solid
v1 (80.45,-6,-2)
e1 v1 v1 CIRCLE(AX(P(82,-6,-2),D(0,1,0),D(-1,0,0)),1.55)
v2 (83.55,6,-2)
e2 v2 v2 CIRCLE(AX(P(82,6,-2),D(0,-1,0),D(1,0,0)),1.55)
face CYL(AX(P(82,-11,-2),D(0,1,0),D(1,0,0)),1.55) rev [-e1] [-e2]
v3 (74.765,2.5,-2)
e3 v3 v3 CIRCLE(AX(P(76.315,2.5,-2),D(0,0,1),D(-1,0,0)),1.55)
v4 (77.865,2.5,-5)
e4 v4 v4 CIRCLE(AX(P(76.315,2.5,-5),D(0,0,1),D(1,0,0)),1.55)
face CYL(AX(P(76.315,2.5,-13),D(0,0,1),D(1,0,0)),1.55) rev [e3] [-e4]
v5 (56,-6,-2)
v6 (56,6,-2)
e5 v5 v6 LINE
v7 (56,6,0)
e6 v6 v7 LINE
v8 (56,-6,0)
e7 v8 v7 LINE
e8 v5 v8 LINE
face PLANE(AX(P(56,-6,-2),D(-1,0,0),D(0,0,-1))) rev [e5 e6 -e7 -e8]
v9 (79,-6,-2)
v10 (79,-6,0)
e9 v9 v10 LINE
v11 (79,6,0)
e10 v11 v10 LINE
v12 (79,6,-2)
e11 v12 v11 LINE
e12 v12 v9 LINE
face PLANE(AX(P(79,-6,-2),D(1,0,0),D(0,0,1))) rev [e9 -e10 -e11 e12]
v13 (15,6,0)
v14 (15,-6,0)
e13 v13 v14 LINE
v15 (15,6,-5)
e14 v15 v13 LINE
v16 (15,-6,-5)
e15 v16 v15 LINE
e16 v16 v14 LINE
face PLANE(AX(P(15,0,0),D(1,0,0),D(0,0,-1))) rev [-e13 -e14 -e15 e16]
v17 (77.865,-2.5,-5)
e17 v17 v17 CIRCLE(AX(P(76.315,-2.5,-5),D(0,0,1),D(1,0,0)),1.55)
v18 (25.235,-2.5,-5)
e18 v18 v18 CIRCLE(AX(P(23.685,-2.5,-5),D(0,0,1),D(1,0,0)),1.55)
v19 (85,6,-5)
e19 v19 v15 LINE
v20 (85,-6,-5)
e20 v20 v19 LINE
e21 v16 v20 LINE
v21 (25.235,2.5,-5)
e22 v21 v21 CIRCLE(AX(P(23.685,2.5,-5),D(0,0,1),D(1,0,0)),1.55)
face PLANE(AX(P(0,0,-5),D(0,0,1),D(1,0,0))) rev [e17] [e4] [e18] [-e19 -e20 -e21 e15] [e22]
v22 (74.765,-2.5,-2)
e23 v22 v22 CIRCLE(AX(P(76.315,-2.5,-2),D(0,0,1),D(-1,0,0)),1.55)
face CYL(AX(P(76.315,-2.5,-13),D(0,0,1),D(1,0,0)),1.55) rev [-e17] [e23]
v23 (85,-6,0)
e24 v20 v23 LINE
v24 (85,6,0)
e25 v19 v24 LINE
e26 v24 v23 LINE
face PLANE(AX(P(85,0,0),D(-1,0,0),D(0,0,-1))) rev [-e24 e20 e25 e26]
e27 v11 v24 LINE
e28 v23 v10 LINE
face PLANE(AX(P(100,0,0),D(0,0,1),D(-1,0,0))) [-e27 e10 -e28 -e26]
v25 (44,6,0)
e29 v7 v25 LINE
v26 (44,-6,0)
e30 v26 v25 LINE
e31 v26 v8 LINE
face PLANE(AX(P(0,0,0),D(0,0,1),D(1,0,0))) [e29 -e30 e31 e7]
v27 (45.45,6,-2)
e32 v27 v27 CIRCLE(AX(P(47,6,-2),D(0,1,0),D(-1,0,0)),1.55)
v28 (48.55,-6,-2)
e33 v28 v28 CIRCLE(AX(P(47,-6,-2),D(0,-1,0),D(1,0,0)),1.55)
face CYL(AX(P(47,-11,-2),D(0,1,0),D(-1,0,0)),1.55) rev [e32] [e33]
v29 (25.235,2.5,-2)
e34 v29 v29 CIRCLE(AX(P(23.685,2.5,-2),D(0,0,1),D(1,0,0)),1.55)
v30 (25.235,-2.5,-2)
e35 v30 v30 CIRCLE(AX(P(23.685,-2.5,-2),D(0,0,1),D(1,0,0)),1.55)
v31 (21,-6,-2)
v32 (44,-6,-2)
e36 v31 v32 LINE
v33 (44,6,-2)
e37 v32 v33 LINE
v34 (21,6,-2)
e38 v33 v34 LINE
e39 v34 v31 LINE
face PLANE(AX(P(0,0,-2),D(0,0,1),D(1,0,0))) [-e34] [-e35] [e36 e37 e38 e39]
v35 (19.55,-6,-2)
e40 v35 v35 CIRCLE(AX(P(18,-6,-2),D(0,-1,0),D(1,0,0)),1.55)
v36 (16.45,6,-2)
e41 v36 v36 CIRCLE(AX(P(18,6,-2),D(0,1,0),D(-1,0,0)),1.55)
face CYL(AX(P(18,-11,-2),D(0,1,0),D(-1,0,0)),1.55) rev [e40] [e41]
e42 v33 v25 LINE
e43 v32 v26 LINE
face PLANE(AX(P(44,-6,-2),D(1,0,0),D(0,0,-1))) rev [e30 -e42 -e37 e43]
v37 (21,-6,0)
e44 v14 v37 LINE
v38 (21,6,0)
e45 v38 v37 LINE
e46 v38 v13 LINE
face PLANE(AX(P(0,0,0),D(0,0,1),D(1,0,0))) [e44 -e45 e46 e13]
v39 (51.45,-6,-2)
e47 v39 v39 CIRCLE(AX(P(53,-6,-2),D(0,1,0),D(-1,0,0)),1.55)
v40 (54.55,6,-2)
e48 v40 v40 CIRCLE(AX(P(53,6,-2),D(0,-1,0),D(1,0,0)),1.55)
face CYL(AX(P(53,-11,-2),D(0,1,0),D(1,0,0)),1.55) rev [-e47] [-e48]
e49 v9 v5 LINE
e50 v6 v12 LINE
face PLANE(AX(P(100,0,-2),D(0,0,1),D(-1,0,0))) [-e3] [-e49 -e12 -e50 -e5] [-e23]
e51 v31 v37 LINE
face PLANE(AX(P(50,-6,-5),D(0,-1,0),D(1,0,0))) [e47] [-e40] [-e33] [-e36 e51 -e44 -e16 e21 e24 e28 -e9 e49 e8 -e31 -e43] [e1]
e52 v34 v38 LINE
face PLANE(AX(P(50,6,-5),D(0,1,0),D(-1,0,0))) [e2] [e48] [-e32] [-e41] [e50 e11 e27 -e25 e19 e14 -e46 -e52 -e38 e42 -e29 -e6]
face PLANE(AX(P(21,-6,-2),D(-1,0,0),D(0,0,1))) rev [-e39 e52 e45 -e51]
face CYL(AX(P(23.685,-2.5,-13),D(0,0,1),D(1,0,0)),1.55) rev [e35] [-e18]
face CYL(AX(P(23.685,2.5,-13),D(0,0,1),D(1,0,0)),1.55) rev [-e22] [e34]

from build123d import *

# Parameters (mm, degrees)
SKETCH_1_W                = 100
SKETCH_1_H                = 12
SKETCH_1_R                = 1.75
EXTRUDE_1_DEPTH           = 5
EXTRUDE_2_DEPTH           = 3
EXTRUDE_5_DEPTH           = 35
CUT_EXTRUDE_START         = -7
CUT_EXTRUDE_3_OUTLINE_R   = 1.75
CUT_EXTRUDE_3_DEPTH       = 14
SKETCH_19_W               = 65
SKETCH_19_H               = 12
CUT_EXTRUDE_7_DEPTH       = 10
CUT_EXTRUDE_8_DEPTH       = 10
SKETCH_21_R               = 1.75
CUT_EXTRUDE_9_DEPTH       = 25
FILLET_3_R                = 2
FILLET_4_R                = 1
FILLET_5_R                = 5
CUT_EXTRUDE_10_DEPTH      = 10
CUT_EXTRUDE_10_DEPTH_BACK = 20
SKETCH_22_W               = 69.035693394
SKETCH_22_H               = 99.85453556
SKETCH_24_W               = 23
SKETCH_24_H               = 12
CUT_EXTRUDE_11_DEPTH      = 2
SKETCH_25_R               = 1.55
CUT_EXTRUDE_12_DEPTH      = 17
SKETCH_27_R               = 1.75
EXTRUDE_7_DEPTH           = 3
SKETCH_28_R               = 1.55
CUT_EXTRUDE_13_DEPTH      = 11


# Read off the part's stored shape, not the designer's step: 切除-拉伸3
with BuildPart() as part:
    # 草图1 → 凸台-拉伸1 (new body)
    with BuildSketch(Plane.XY):
        Rectangle(SKETCH_1_W, SKETCH_1_H)
        with Locations((-26.315, 2.5)):
            Circle(SKETCH_1_R, mode=Mode.SUBTRACT)
        with Locations((-26.315, -2.5)):
            Circle(SKETCH_1_R, mode=Mode.SUBTRACT)
        with Locations((26.315, -2.5)):
            Circle(SKETCH_1_R, mode=Mode.SUBTRACT)
        with Locations((26.315, 2.5)):
            Circle(SKETCH_1_R, mode=Mode.SUBTRACT)
    extrude(amount=-EXTRUDE_1_DEPTH)

    # 草图2 → 凸台-拉伸2 (add)
    with BuildSketch(Plane(origin=(15, 0, 0), x_dir=(0, 0, -1), z_dir=(1, 0, 0))):
        Polygon((0, 6), (-92, 7), (-92, -7), (0, -6), align=None)
    extrude(amount=EXTRUDE_2_DEPTH)

    # 草图10 → 凸台-拉伸5 (add)
    with BuildSketch(Plane(origin=(18, 0, 0), x_dir=(0, 0, -1), z_dir=(1, 0, 0))):
        Polygon((-92, -3.999822784), (-92, -7), (0, -6), (0, -2.999822784), align=None)
        Polygon((-92, 7), (-92, 3.999822784), (0, 2.999822784), (0, 6), align=None)
    extrude(amount=EXTRUDE_5_DEPTH)

    # 切除-拉伸3 outline → 切除-拉伸3 (cut)
    with BuildSketch(Plane(origin=(0, 0, 0), x_dir=(1, 0, 0), z_dir=(0, 1, 0)).offset(CUT_EXTRUDE_START)):
        Polygon((29.145728922, -84.958399081), (31.382950186, -83.842674644), (15, -50.992014289), (15, -92), (32.657445151, -92), align=None)
        Polygon((42.101361871, -11.45542087), (17.526825547, -47.095951771), (33.361948293, -78.848122968), align=None)
        Polygon((40.711441699, -87.983392029), (32.657445151, -92), (53, -92), (53, 0), (50, 0), (44.585265539, -7.853007208), (34.962504207, -82.057515546), (37.199725471, -80.941791109), align=None)
        with Locations((19, -37.702345436)):
            Circle(CUT_EXTRUDE_3_OUTLINE_R)
        with BuildLine():
            Line((22.646536548, -32.624253352), (45.141316474, 0))
            Line((45.141316474, 0), (19, 0))
            Line((19, 0), (19, -31.488948372))
            ThreePointArc((19, -31.488948372), (20.405472076, -33.398539047), (22.646536548, -32.624253352))
        make_face()
    extrude(amount=CUT_EXTRUDE_3_DEPTH, mode=Mode.SUBTRACT)

    # 草图19 → 切除-拉伸7 (cut)
    with BuildSketch(Plane.XY):
        with Locations((-17.5, 0)):
            Rectangle(SKETCH_19_W, SKETCH_19_H)
    extrude(amount=-CUT_EXTRUDE_7_DEPTH, mode=Mode.SUBTRACT)

    # 草图20 → 切除-拉伸8 (cut)
    with BuildSketch(Plane.ZY.offset(-15)):
        Polygon((0, 2.999822784), (0, -2.999822784), (59.734349104, -3.649109187), (59.734349104, 3.649109187), align=None)
    extrude(amount=-CUT_EXTRUDE_8_DEPTH, mode=Mode.SUBTRACT)

    # 草图21 → 切除-拉伸9 (cut, symmetric)
    with BuildSketch(Plane(origin=(0, 0, 0.28540368), x_dir=(1, 0, 0), z_dir=(0, -1, 0))):
        with Locations(Location((35, 86.328690729, 0), (0, 0, 270))):
            Circle(SKETCH_21_R)
    extrude(amount=CUT_EXTRUDE_9_DEPTH, both=True, mode=Mode.SUBTRACT)

    # 圆角3
    # the kernel refuses this fillet: 2 mm, written as the material it adds along each edge
    with BuildSketch(Plane(origin=(31.382950186, -1.088843796, 83.842674644), x_dir=(-0.4462897746148819, 0, -0.8948885053872343), z_dir=(0, 1, 0))) as fillet_3_piece_1_section:
        with BuildLine():
            CenterArc((FILLET_3_R, FILLET_3_R), FILLET_3_R, 180.000000004, 89.999999996)
            Line((-FILLET_3_R * 7.06970432153e-11, FILLET_3_R), (-FILLET_3_R * 0.0200000000707, FILLET_3_R))
            Line((-FILLET_3_R * 0.0200000000707, FILLET_3_R), (-FILLET_3_R * 0.0199999999986, -FILLET_3_R * 0.02))
            Line((-FILLET_3_R * 0.0199999999986, -FILLET_3_R * 0.02), (FILLET_3_R, -FILLET_3_R * 0.02))
            Line((FILLET_3_R, -FILLET_3_R * 0.02), (FILLET_3_R, 0))
        make_face()
    fillet_3_piece_1 = extrude(amount=13.000177215, mode=Mode.PRIVATE)
    fillet_3_piece_1 = split(fillet_3_piece_1, bisect_by=Plane(origin=(30.775677766, 3.909125577, 83.655856907), z_dir=(0, 0.9999409315100345, -0.01086892316858714)), keep=Keep.TOP, mode=Mode.PRIVATE)
    fillet_3_piece_1 = split(fillet_3_piece_1, bisect_by=Plane(origin=(30.775677766, 6.908948371, 83.623250137), z_dir=(0, -0.9999409315100345, 0.010868923168587275)), keep=Keep.TOP, mode=Mode.PRIVATE)
    add(fillet_3_piece_1)
    with BuildSketch(Plane(origin=(31.382950186, -11.91133342, 83.842674644), x_dir=(-0.8948885053556793, 0, 0.44628977467815495), z_dir=(0, 1, 0))) as fillet_3_piece_2_section:
        with BuildLine():
            CenterArc((FILLET_3_R, -FILLET_3_R), FILLET_3_R, 90, 89.999999996)
            Line((-FILLET_3_R * 7.0703401566e-11, -FILLET_3_R), (-FILLET_3_R * 0.0200000000707, -FILLET_3_R))
            Line((-FILLET_3_R * 0.0200000000707, -FILLET_3_R), (-FILLET_3_R * 0.0199999999986, FILLET_3_R * 0.02))
            Line((-FILLET_3_R * 0.0199999999986, FILLET_3_R * 0.02), (FILLET_3_R, FILLET_3_R * 0.02))
            Line((FILLET_3_R, FILLET_3_R * 0.02), (FILLET_3_R, 0))
        make_face()
    fillet_3_piece_2 = extrude(amount=13.000177215, mode=Mode.PRIVATE)
    fillet_3_piece_2 = split(fillet_3_piece_2, bisect_by=Plane(origin=(30.775677766, -6.908948371, 83.623250137), z_dir=(0, 0.9999409315100345, 0.01086892316858739)), keep=Keep.TOP, mode=Mode.PRIVATE)
    fillet_3_piece_2 = split(fillet_3_piece_2, bisect_by=Plane(origin=(30.775677766, -3.909125577, 83.655856907), z_dir=(0, -0.9999409315100345, -0.010868923168587516)), keep=Keep.TOP, mode=Mode.PRIVATE)
    add(fillet_3_piece_2)
    with BuildSketch(Plane(origin=(17.526825547, -9.462581156, 47.095951771), x_dir=(0.4462897746085541, 0, 0.8948885053903899), z_dir=(0, 1, 0))) as fillet_3_piece_3_section:
        with BuildLine():
            CenterArc((FILLET_3_R * 0.590133727356, FILLET_3_R), FILLET_3_R, 208.907423837, 61.092576163)
            Line((-FILLET_3_R * 0.285268173202, FILLET_3_R * 0.516604186511), (-FILLET_3_R * 0.302776211214, FILLET_3_R * 0.506936270242))
            Line((-FILLET_3_R * 0.302776211214, FILLET_3_R * 0.506936270242), (-FILLET_3_R * 0.0118026745471, -FILLET_3_R * 0.02))
            Line((-FILLET_3_R * 0.0118026745471, -FILLET_3_R * 0.02), (FILLET_3_R * 0.590133727356, -FILLET_3_R * 0.02))
            Line((FILLET_3_R * 0.590133727356, -FILLET_3_R * 0.02), (FILLET_3_R * 0.590133727356, 0))
        make_face()
    fillet_3_piece_3 = extrude(amount=8.90151449, mode=Mode.PRIVATE)
    fillet_3_piece_3 = split(fillet_3_piece_3, bisect_by=Plane(origin=(17.786448955, -6.511934641, 47.097986993), z_dir=(0, 0.9999409315100345, 0.01086892316858739)), keep=Keep.TOP, mode=Mode.PRIVATE)
    fillet_3_piece_3 = split(fillet_3_piece_3, bisect_by=Plane(origin=(17.786448955, -3.512111847, 47.130593763), z_dir=(0, -0.9999409315100345, -0.010868923168587516)), keep=Keep.TOP, mode=Mode.PRIVATE)
    add(fillet_3_piece_3)
    with BuildSketch(Plane(origin=(34.962504207, -4.590143726, 82.057515546), x_dir=(0.8948885053556189, 0, -0.44628977467827596), z_dir=(0, 1, 0))) as fillet_3_piece_4_section:
        with BuildLine():
            CenterArc((3.552161927, 1.700868978), FILLET_3_R, 146.105291032, 92.153667276)
            Line((1.892034353, 2.816205895), (1.858831801, 2.838512633))
            Line((1.858831801, 2.838512633), (-0.033202551, 0.022306738))
            Line((-0.033202551, 0.022306738), (0, -0.04))
            ThreePointArc((0, -0.04), (1.25, -0.04), (2.478956762, -0.03401738))
            Line((2.478956762, -0.03401738), (2.500000001, 0))
        make_face()
    fillet_3_piece_4 = extrude(amount=19.96396927, mode=Mode.PRIVATE)
    fillet_3_piece_4 = split(fillet_3_piece_4, bisect_by=Plane(origin=(35.702859812, -3.878883458, 80.873581964), z_dir=(0, -0.9999409315100345, -0.010868923168587516)), keep=Keep.TOP, mode=Mode.PRIVATE)
    add(fillet_3_piece_4)
    with BuildSketch(Plane(origin=(34.962504207, -4.590143726, 82.057515546), x_dir=(0.8948885053556189, 0, -0.44628977467827596), z_dir=(0, 1, 0))) as fillet_3_piece_5_section:
        with BuildLine():
            CenterArc((3.552161927, 1.700868978), FILLET_3_R, 146.105291032, 92.153667276)
            Line((1.892034353, 2.816205895), (1.858831801, 2.838512633))
            Line((1.858831801, 2.838512633), (-0.033202551, 0.022306738))
            Line((-0.033202551, 0.022306738), (0, -0.04))
            ThreePointArc((0, -0.04), (1.25, -0.04), (2.478956762, -0.03401738))
            Line((2.478956762, -0.03401738), (2.500000001, 0))
        make_face()
    fillet_3_piece_5 = extrude(amount=19.96396927, mode=Mode.PRIVATE)
    fillet_3_piece_5 = split(fillet_3_piece_5, bisect_by=Plane(origin=(35.703261473, 3.879081131, 80.891767963), z_dir=(0, 0.9999409315100345, -0.01086892316858714)), keep=Keep.TOP, mode=Mode.PRIVATE)
    fillet_3_piece_5 = split(fillet_3_piece_5, bisect_by=Plane(origin=(35.703261473, 6.878903926, 80.859161193), z_dir=(0, -0.9999409315100345, 0.010868923168587275)), keep=Keep.TOP, mode=Mode.PRIVATE)
    add(fillet_3_piece_5)
    with BuildSketch(Plane(origin=(34.962504207, -15.373825544, 82.057515546), x_dir=(0.8948885053556189, 0, -0.44628977467827596), z_dir=(0, 1, 0))) as fillet_3_piece_6_section:
        with BuildLine():
            CenterArc((3.552161927, 1.700868978), FILLET_3_R, 146.105291032, 92.153667276)
            Line((1.892034353, 2.816205895), (1.858831801, 2.838512633))
            Line((1.858831801, 2.838512633), (-0.033202551, 0.022306738))
            Line((-0.033202551, 0.022306738), (0, -0.04))
            ThreePointArc((0, -0.04), (1.25, -0.04), (2.478956762, -0.03401738))
            Line((2.478956762, -0.03401738), (2.500000001, 0))
        make_face()
    fillet_3_piece_6 = extrude(amount=19.96396927, mode=Mode.PRIVATE)
    fillet_3_piece_6 = split(fillet_3_piece_6, bisect_by=Plane(origin=(35.703261473, -6.878903926, 80.859161193), z_dir=(0, 0.9999409315100345, 0.01086892316858739)), keep=Keep.TOP, mode=Mode.PRIVATE)
    fillet_3_piece_6 = split(fillet_3_piece_6, bisect_by=Plane(origin=(35.703261473, -3.879081131, 80.891767963), z_dir=(0, -0.9999409315100345, -0.010868923168587516)), keep=Keep.TOP, mode=Mode.PRIVATE)
    add(fillet_3_piece_6)
    with BuildSketch(Plane(origin=(34.962504207, -15.373825544, 82.057515546), x_dir=(0.8948885053556189, 0, -0.44628977467827596), z_dir=(0, 1, 0))) as fillet_3_piece_7_section:
        with BuildLine():
            CenterArc((3.552161927, 1.700868978), FILLET_3_R, 146.105291032, 92.153667276)
            Line((1.892034353, 2.816205895), (1.858831801, 2.838512633))
            Line((1.858831801, 2.838512633), (-0.033202551, 0.022306738))
            Line((-0.033202551, 0.022306738), (0, -0.04))
            ThreePointArc((0, -0.04), (1.25, -0.04), (2.478956762, -0.03401738))
            Line((2.478956762, -0.03401738), (2.500000001, 0))
        make_face()
    fillet_3_piece_7 = extrude(amount=19.96396927, mode=Mode.PRIVATE)
    fillet_3_piece_7 = split(fillet_3_piece_7, bisect_by=Plane(origin=(35.702859812, 3.878883458, 80.873581964), z_dir=(0, 0.9999409315100345, -0.01086892316858714)), keep=Keep.TOP, mode=Mode.PRIVATE)
    add(fillet_3_piece_7)
    with BuildSketch(Plane(origin=(17.526825547, 0.561066667, 47.095951771), x_dir=(0.4462897746085541, 0, 0.8948885053903899), z_dir=(0, 1, 0))) as fillet_3_piece_8_section:
        with BuildLine():
            CenterArc((FILLET_3_R * 0.590133727356, FILLET_3_R), FILLET_3_R, 208.907423837, 61.092576163)
            Line((-FILLET_3_R * 0.285268173202, FILLET_3_R * 0.516604186511), (-FILLET_3_R * 0.302776211214, FILLET_3_R * 0.506936270242))
            Line((-FILLET_3_R * 0.302776211214, FILLET_3_R * 0.506936270242), (-FILLET_3_R * 0.0118026745471, -FILLET_3_R * 0.02))
            Line((-FILLET_3_R * 0.0118026745471, -FILLET_3_R * 0.02), (FILLET_3_R * 0.590133727356, -FILLET_3_R * 0.02))
            Line((FILLET_3_R * 0.590133727356, -FILLET_3_R * 0.02), (FILLET_3_R * 0.590133727356, 0))
        make_face()
    fillet_3_piece_8 = extrude(amount=8.90151449, mode=Mode.PRIVATE)
    fillet_3_piece_8 = split(fillet_3_piece_8, bisect_by=Plane(origin=(17.786448955, 3.512111847, 47.130593763), z_dir=(0, 0.9999409315100345, -0.01086892316858714)), keep=Keep.TOP, mode=Mode.PRIVATE)
    fillet_3_piece_8 = split(fillet_3_piece_8, bisect_by=Plane(origin=(17.786448955, 6.511934641, 47.097986993), z_dir=(0, -0.9999409315100345, 0.010868923168587275)), keep=Keep.TOP, mode=Mode.PRIVATE)
    add(fillet_3_piece_8)
    with BuildSketch(Plane(origin=(19, -11, 0), x_dir=(1, 0, 0), z_dir=(0, 1, 0))) as fillet_3_piece_9_section:
        with BuildLine():
            CenterArc((FILLET_3_R, -FILLET_3_R), FILLET_3_R, 90, 90)
            Line((0, -FILLET_3_R), (-FILLET_3_R * 0.02, -FILLET_3_R))
            Line((-FILLET_3_R * 0.02, -FILLET_3_R), (-FILLET_3_R * 0.02, FILLET_3_R * 0.02))
            Line((-FILLET_3_R * 0.02, FILLET_3_R * 0.02), (FILLET_3_R, FILLET_3_R * 0.02))
            Line((FILLET_3_R, FILLET_3_R * 0.02), (FILLET_3_R, 0))
        make_face()
    fillet_3_piece_9 = extrude(amount=13.000177216, mode=Mode.PRIVATE)
    fillet_3_piece_9 = split(fillet_3_piece_9, bisect_by=Plane(origin=(19.212945359, -6, 0.86023594), z_dir=(0, -1, 0)), keep=Keep.TOP, mode=Mode.PRIVATE)
    fillet_3_piece_9 = split(fillet_3_piece_9, bisect_by=Plane(origin=(19.212945359, -6.009349838, 0.860185129), z_dir=(0, 0.9999409315100345, 0.01086892316858739)), keep=Keep.TOP, mode=Mode.PRIVATE)
    add(fillet_3_piece_9)
    with BuildSketch(Plane(origin=(19, -6, 0), x_dir=(1, 0, 0), z_dir=(0, 1, 0))) as fillet_3_piece_10_section:
        with BuildLine():
            CenterArc((FILLET_3_R, -FILLET_3_R), FILLET_3_R, 90, 90)
            Line((0, -FILLET_3_R), (-FILLET_3_R * 0.02, -FILLET_3_R))
            Line((-FILLET_3_R * 0.02, -FILLET_3_R), (-FILLET_3_R * 0.02, FILLET_3_R * 0.02))
            Line((-FILLET_3_R * 0.02, FILLET_3_R * 0.02), (FILLET_3_R, FILLET_3_R * 0.02))
            Line((FILLET_3_R, FILLET_3_R * 0.02), (FILLET_3_R, 0))
        make_face()
    fillet_3_piece_10 = extrude(amount=8.000177216, mode=Mode.PRIVATE)
    fillet_3_piece_10 = split(fillet_3_piece_10, bisect_by=Plane(origin=(19.453185723, -3.004914034, 0.468394952), z_dir=(0, -0.9999409315100345, -0.010868923168587516)), keep=Keep.TOP, mode=Mode.PRIVATE)
    add(fillet_3_piece_10)
    with BuildSketch(Plane(origin=(19, -6, 0), x_dir=(1, 0, 0), z_dir=(0, 1, 0))) as fillet_3_piece_11_section:
        with BuildLine():
            CenterArc((FILLET_3_R, -FILLET_3_R), FILLET_3_R, 90, 90)
            Line((0, -FILLET_3_R), (-FILLET_3_R * 0.02, -FILLET_3_R))
            Line((-FILLET_3_R * 0.02, -FILLET_3_R), (-FILLET_3_R * 0.02, FILLET_3_R * 0.02))
            Line((-FILLET_3_R * 0.02, FILLET_3_R * 0.02), (FILLET_3_R, FILLET_3_R * 0.02))
            Line((FILLET_3_R, FILLET_3_R * 0.02), (FILLET_3_R, 0))
        make_face()
    fillet_3_piece_11 = extrude(amount=8.000177216, mode=Mode.PRIVATE)
    fillet_3_piece_11 = split(fillet_3_piece_11, bisect_by=Plane(origin=(19.98, -5.999710162, -0.026665092), z_dir=(0, -0.9999409315100345, -0.01086892316858739)), keep=Keep.TOP, mode=Mode.PRIVATE)
    add(fillet_3_piece_11)
    with BuildSketch(Plane(origin=(19, -2.000177216, 0), x_dir=(1, 0, 0), z_dir=(0, 1, 0))) as fillet_3_piece_12_section:
        with BuildLine():
            CenterArc((FILLET_3_R, -FILLET_3_R), FILLET_3_R, 90, 90)
            Line((0, -FILLET_3_R), (-FILLET_3_R * 0.02, -FILLET_3_R))
            Line((-FILLET_3_R * 0.02, -FILLET_3_R), (-FILLET_3_R * 0.02, FILLET_3_R * 0.02))
            Line((-FILLET_3_R * 0.02, FILLET_3_R * 0.02), (FILLET_3_R, FILLET_3_R * 0.02))
            Line((FILLET_3_R, FILLET_3_R * 0.02), (FILLET_3_R, 0))
        make_face()
    fillet_3_piece_12 = extrude(amount=8.000177216, mode=Mode.PRIVATE)
    fillet_3_piece_12 = split(fillet_3_piece_12, bisect_by=Plane(origin=(19.453185723, 3.004914034, 0.468394952), z_dir=(0, 0.9999409315100345, -0.01086892316858714)), keep=Keep.TOP, mode=Mode.PRIVATE)
    add(fillet_3_piece_12)
    with BuildSketch(Plane(origin=(19, -2.000177216, 0), x_dir=(1, 0, 0), z_dir=(0, 1, 0))) as fillet_3_piece_13_section:
        with BuildLine():
            CenterArc((FILLET_3_R, -FILLET_3_R), FILLET_3_R, 90, 90)
            Line((0, -FILLET_3_R), (-FILLET_3_R * 0.02, -FILLET_3_R))
            Line((-FILLET_3_R * 0.02, -FILLET_3_R), (-FILLET_3_R * 0.02, FILLET_3_R * 0.02))
            Line((-FILLET_3_R * 0.02, FILLET_3_R * 0.02), (FILLET_3_R, FILLET_3_R * 0.02))
            Line((FILLET_3_R, FILLET_3_R * 0.02), (FILLET_3_R, 0))
        make_face()
    fillet_3_piece_13 = extrude(amount=13.000177216, mode=Mode.PRIVATE)
    fillet_3_piece_13 = split(fillet_3_piece_13, bisect_by=Plane(origin=(19.212945359, 6, 0.86023594), z_dir=(0, 1, 0)), keep=Keep.TOP, mode=Mode.PRIVATE)
    fillet_3_piece_13 = split(fillet_3_piece_13, bisect_by=Plane(origin=(19.212945359, 6.009349838, 0.860185129), z_dir=(0, -0.9999409315100345, 0.010868923168587275)), keep=Keep.TOP, mode=Mode.PRIVATE)
    add(fillet_3_piece_13)
    with BuildSketch(Plane(origin=(19, -2.000177216, 0), x_dir=(1, 0, 0), z_dir=(0, 1, 0))) as fillet_3_piece_14_section:
        with BuildLine():
            CenterArc((FILLET_3_R, -FILLET_3_R), FILLET_3_R, 90, 90)
            Line((0, -FILLET_3_R), (-FILLET_3_R * 0.02, -FILLET_3_R))
            Line((-FILLET_3_R * 0.02, -FILLET_3_R), (-FILLET_3_R * 0.02, FILLET_3_R * 0.02))
            Line((-FILLET_3_R * 0.02, FILLET_3_R * 0.02), (FILLET_3_R, FILLET_3_R * 0.02))
            Line((FILLET_3_R, FILLET_3_R * 0.02), (FILLET_3_R, 0))
        make_face()
    fillet_3_piece_14 = extrude(amount=8.000177216, mode=Mode.PRIVATE)
    fillet_3_piece_14 = split(fillet_3_piece_14, bisect_by=Plane(origin=(19.98, 5.999710162, -0.026665092), z_dir=(0, 0.9999409315100345, -0.010868923168587275)), keep=Keep.TOP, mode=Mode.PRIVATE)
    add(fillet_3_piece_14)
    with BuildSketch(Plane(origin=(45.141316474, -6.521086374, 0), x_dir=(-1, 0, 0), z_dir=(0, 1, 0))) as fillet_3_piece_15_section:
        with BuildLine():
            CenterArc((FILLET_3_R * 1.90418183162, FILLET_3_R), FILLET_3_R, 145.413311576, 124.586688424)
            Line((FILLET_3_R * 1.08091355769, FILLET_3_R * 1.56765248977), (FILLET_3_R * 1.06444819221, FILLET_3_R * 1.57900553956))
            Line((FILLET_3_R * 1.06444819221, FILLET_3_R * 1.57900553956), (-FILLET_3_R * 0.0164653654786, FILLET_3_R * 0.0113530497954))
            Line((-FILLET_3_R * 0.0164653654786, FILLET_3_R * 0.0113530497954), (0, -FILLET_3_R * 0.02))
            Line((0, -FILLET_3_R * 0.02), (FILLET_3_R * 1.90418183162, -FILLET_3_R * 0.02))
            Line((FILLET_3_R * 1.90418183162, -FILLET_3_R * 0.02), (FILLET_3_R * 1.90418183162, 0))
        make_face()
    fillet_3_piece_15 = extrude(amount=12.521086374, mode=Mode.PRIVATE)
    fillet_3_piece_15 = split(fillet_3_piece_15, bisect_by=Plane(origin=(43.662831951, -6, 1.349647934), z_dir=(0, -1, 0)), keep=Keep.TOP, mode=Mode.PRIVATE)
    fillet_3_piece_15 = split(fillet_3_piece_15, bisect_by=Plane(origin=(43.662831951, -6.01466922, 1.349568214), z_dir=(0, 0.9999409315100345, 0.01086892316858739)), keep=Keep.TOP, mode=Mode.PRIVATE)
    add(fillet_3_piece_15)
    with BuildSketch(Plane(origin=(45.141316474, -6.521086374, 0), x_dir=(-1, 0, 0), z_dir=(0, 1, 0))) as fillet_3_piece_16_section:
        with BuildLine():
            CenterArc((FILLET_3_R * 1.90418183162, FILLET_3_R), FILLET_3_R, 145.413311576, 124.586688424)
            Line((FILLET_3_R * 1.08091355769, FILLET_3_R * 1.56765248977), (FILLET_3_R * 1.06444819221, FILLET_3_R * 1.57900553956))
            Line((FILLET_3_R * 1.06444819221, FILLET_3_R * 1.57900553956), (-FILLET_3_R * 0.0164653654786, FILLET_3_R * 0.0113530497954))
            Line((-FILLET_3_R * 0.0164653654786, FILLET_3_R * 0.0113530497954), (0, -FILLET_3_R * 0.02))
            Line((0, -FILLET_3_R * 0.02), (FILLET_3_R * 1.90418183162, -FILLET_3_R * 0.02))
            Line((FILLET_3_R * 1.90418183162, -FILLET_3_R * 0.02), (FILLET_3_R * 1.90418183162, 0))
        make_face()
    fillet_3_piece_16 = extrude(amount=12.521086374, mode=Mode.PRIVATE)
    fillet_3_piece_16 = split(fillet_3_piece_16, bisect_by=Plane(origin=(43.652851134, -6, 0.780052661), z_dir=(0, 1, 0)), keep=Keep.TOP, mode=Mode.PRIVATE)
    fillet_3_piece_16 = split(fillet_3_piece_16, bisect_by=Plane(origin=(43.652851134, -3.008478327, 0.79630992), z_dir=(0, -0.9999409315100345, -0.010868923168587516)), keep=Keep.TOP, mode=Mode.PRIVATE)
    add(fillet_3_piece_16)
    with BuildSketch(Plane(origin=(45.141316474, -6.521086374, 0), x_dir=(-1, 0, 0), z_dir=(0, 1, 0))) as fillet_3_piece_17_section:
        with BuildLine():
            CenterArc((FILLET_3_R * 1.90418183162, FILLET_3_R), FILLET_3_R, 145.413311576, 124.586688424)
            Line((FILLET_3_R * 1.08091355769, FILLET_3_R * 1.56765248977), (FILLET_3_R * 1.06444819221, FILLET_3_R * 1.57900553956))
            Line((FILLET_3_R * 1.06444819221, FILLET_3_R * 1.57900553956), (-FILLET_3_R * 0.0164653654786, FILLET_3_R * 0.0113530497954))
            Line((-FILLET_3_R * 0.0164653654786, FILLET_3_R * 0.0113530497954), (0, -FILLET_3_R * 0.02))
            Line((0, -FILLET_3_R * 0.02), (FILLET_3_R * 1.90418183162, -FILLET_3_R * 0.02))
            Line((FILLET_3_R * 1.90418183162, -FILLET_3_R * 0.02), (FILLET_3_R * 1.90418183162, 0))
        make_face()
    fillet_3_piece_17 = extrude(amount=12.521086374, mode=Mode.PRIVATE)
    fillet_3_piece_17 = split(fillet_3_piece_17, bisect_by=Plane(origin=(43.240638921, -6, -0.026654432), z_dir=(0, 1, 0)), keep=Keep.TOP, mode=Mode.PRIVATE)
    fillet_3_piece_17 = split(fillet_3_piece_17, bisect_by=Plane(origin=(43.240638921, -5.999710295, -0.026652857), z_dir=(0, -0.9999409315100345, -0.01086892316858739)), keep=Keep.TOP, mode=Mode.PRIVATE)
    add(fillet_3_piece_17)
    with BuildSketch(Plane(origin=(45.141316474, -6.521086374, 0), x_dir=(-1, 0, 0), z_dir=(0, 1, 0))) as fillet_3_piece_18_section:
        with BuildLine():
            CenterArc((FILLET_3_R * 1.90418183162, FILLET_3_R), FILLET_3_R, 145.413311576, 124.586688424)
            Line((FILLET_3_R * 1.08091355769, FILLET_3_R * 1.56765248977), (FILLET_3_R * 1.06444819221, FILLET_3_R * 1.57900553956))
            Line((FILLET_3_R * 1.06444819221, FILLET_3_R * 1.57900553956), (-FILLET_3_R * 0.0164653654786, FILLET_3_R * 0.0113530497954))
            Line((-FILLET_3_R * 0.0164653654786, FILLET_3_R * 0.0113530497954), (0, -FILLET_3_R * 0.02))
            Line((0, -FILLET_3_R * 0.02), (FILLET_3_R * 1.90418183162, -FILLET_3_R * 0.02))
            Line((FILLET_3_R * 1.90418183162, -FILLET_3_R * 0.02), (FILLET_3_R * 1.90418183162, 0))
        make_face()
    fillet_3_piece_18 = extrude(amount=12.521086374, mode=Mode.PRIVATE)
    fillet_3_piece_18 = split(fillet_3_piece_18, bisect_by=Plane(origin=(43.652851134, 3.008478327, 0.79630992), z_dir=(0, 0.9999409315100345, -0.01086892316858714)), keep=Keep.TOP, mode=Mode.PRIVATE)
    add(fillet_3_piece_18)
    with BuildSketch(Plane(origin=(45.141316474, -6.521086374, 0), x_dir=(-1, 0, 0), z_dir=(0, 1, 0))) as fillet_3_piece_19_section:
        with BuildLine():
            CenterArc((FILLET_3_R * 1.90418183162, FILLET_3_R), FILLET_3_R, 145.413311576, 124.586688424)
            Line((FILLET_3_R * 1.08091355769, FILLET_3_R * 1.56765248977), (FILLET_3_R * 1.06444819221, FILLET_3_R * 1.57900553956))
            Line((FILLET_3_R * 1.06444819221, FILLET_3_R * 1.57900553956), (-FILLET_3_R * 0.0164653654786, FILLET_3_R * 0.0113530497954))
            Line((-FILLET_3_R * 0.0164653654786, FILLET_3_R * 0.0113530497954), (0, -FILLET_3_R * 0.02))
            Line((0, -FILLET_3_R * 0.02), (FILLET_3_R * 1.90418183162, -FILLET_3_R * 0.02))
            Line((FILLET_3_R * 1.90418183162, -FILLET_3_R * 0.02), (FILLET_3_R * 1.90418183162, 0))
        make_face()
    fillet_3_piece_19 = extrude(amount=22.041995532, mode=Mode.PRIVATE)
    fillet_3_piece_19 = split(fillet_3_piece_19, bisect_by=Plane(origin=(43.662831951, 6, 1.349647934), z_dir=(0, 1, 0)), keep=Keep.TOP, mode=Mode.PRIVATE)
    fillet_3_piece_19 = split(fillet_3_piece_19, bisect_by=Plane(origin=(43.662831951, 6.01466922, 1.349568214), z_dir=(0, -0.9999409315100345, 0.010868923168587275)), keep=Keep.TOP, mode=Mode.PRIVATE)
    add(fillet_3_piece_19)
    with BuildSketch(Plane(origin=(45.141316474, -6.521086374, 0), x_dir=(-1, 0, 0), z_dir=(0, 1, 0))) as fillet_3_piece_20_section:
        with BuildLine():
            CenterArc((FILLET_3_R * 1.90418183162, FILLET_3_R), FILLET_3_R, 145.413311576, 124.586688424)
            Line((FILLET_3_R * 1.08091355769, FILLET_3_R * 1.56765248977), (FILLET_3_R * 1.06444819221, FILLET_3_R * 1.57900553956))
            Line((FILLET_3_R * 1.06444819221, FILLET_3_R * 1.57900553956), (-FILLET_3_R * 0.0164653654786, FILLET_3_R * 0.0113530497954))
            Line((-FILLET_3_R * 0.0164653654786, FILLET_3_R * 0.0113530497954), (0, -FILLET_3_R * 0.02))
            Line((0, -FILLET_3_R * 0.02), (FILLET_3_R * 1.90418183162, -FILLET_3_R * 0.02))
            Line((FILLET_3_R * 1.90418183162, -FILLET_3_R * 0.02), (FILLET_3_R * 1.90418183162, 0))
        make_face()
    fillet_3_piece_20 = extrude(amount=12.521086374, mode=Mode.PRIVATE)
    fillet_3_piece_20 = split(fillet_3_piece_20, bisect_by=Plane(origin=(43.240638921, 5.999710295, -0.026652857), z_dir=(0, 0.9999409315100345, -0.010868923168587275)), keep=Keep.TOP, mode=Mode.PRIVATE)
    add(fillet_3_piece_20)
    with BuildSketch(Plane(origin=(45.141316474, -15.520909158, 0), x_dir=(-1, 0, 0), z_dir=(0, 1, 0))) as fillet_3_piece_21_section:
        with BuildLine():
            CenterArc((FILLET_3_R * 1.90418183162, FILLET_3_R), FILLET_3_R, 145.413311576, 124.586688424)
            Line((FILLET_3_R * 1.08091355769, FILLET_3_R * 1.56765248977), (FILLET_3_R * 1.06444819221, FILLET_3_R * 1.57900553956))
            Line((FILLET_3_R * 1.06444819221, FILLET_3_R * 1.57900553956), (-FILLET_3_R * 0.0164653654786, FILLET_3_R * 0.0113530497954))
            Line((-FILLET_3_R * 0.0164653654786, FILLET_3_R * 0.0113530497954), (0, -FILLET_3_R * 0.02))
            Line((0, -FILLET_3_R * 0.02), (FILLET_3_R * 1.90418183162, -FILLET_3_R * 0.02))
            Line((FILLET_3_R * 1.90418183162, -FILLET_3_R * 0.02), (FILLET_3_R * 1.90418183162, 0))
        make_face()
    fillet_3_piece_21 = extrude(amount=22.041995532, mode=Mode.PRIVATE)
    fillet_3_piece_21 = split(fillet_3_piece_21, bisect_by=Plane(origin=(43.662831951, -6, 1.349647934), z_dir=(0, -1, 0)), keep=Keep.TOP, mode=Mode.PRIVATE)
    fillet_3_piece_21 = split(fillet_3_piece_21, bisect_by=Plane(origin=(43.662831951, -6.01466922, 1.349568214), z_dir=(0, 0.9999409315100345, 0.01086892316858739)), keep=Keep.TOP, mode=Mode.PRIVATE)
    add(fillet_3_piece_21)
    with BuildSketch(Plane(origin=(45.141316474, -6, 0), x_dir=(-1, 0, 0), z_dir=(0, 1, 0))) as fillet_3_piece_22_section:
        with BuildLine():
            CenterArc((FILLET_3_R * 1.90418183162, FILLET_3_R), FILLET_3_R, 145.413311576, 124.586688424)
            Line((FILLET_3_R * 1.08091355769, FILLET_3_R * 1.56765248977), (FILLET_3_R * 1.06444819221, FILLET_3_R * 1.57900553956))
            Line((FILLET_3_R * 1.06444819221, FILLET_3_R * 1.57900553956), (-FILLET_3_R * 0.0164653654786, FILLET_3_R * 0.0113530497954))
            Line((-FILLET_3_R * 0.0164653654786, FILLET_3_R * 0.0113530497954), (0, -FILLET_3_R * 0.02))
            Line((0, -FILLET_3_R * 0.02), (FILLET_3_R * 1.90418183162, -FILLET_3_R * 0.02))
            Line((FILLET_3_R * 1.90418183162, -FILLET_3_R * 0.02), (FILLET_3_R * 1.90418183162, 0))
        make_face()
    fillet_3_piece_22 = extrude(amount=12.521086374, mode=Mode.PRIVATE)
    fillet_3_piece_22 = split(fillet_3_piece_22, bisect_by=Plane(origin=(43.652851134, -3.008478327, 0.79630992), z_dir=(0, -0.9999409315100345, -0.010868923168587516)), keep=Keep.TOP, mode=Mode.PRIVATE)
    add(fillet_3_piece_22)
    with BuildSketch(Plane(origin=(45.141316474, -6, 0), x_dir=(-1, 0, 0), z_dir=(0, 1, 0))) as fillet_3_piece_23_section:
        with BuildLine():
            CenterArc((FILLET_3_R * 1.90418183162, FILLET_3_R), FILLET_3_R, 145.413311576, 124.586688424)
            Line((FILLET_3_R * 1.08091355769, FILLET_3_R * 1.56765248977), (FILLET_3_R * 1.06444819221, FILLET_3_R * 1.57900553956))
            Line((FILLET_3_R * 1.06444819221, FILLET_3_R * 1.57900553956), (-FILLET_3_R * 0.0164653654786, FILLET_3_R * 0.0113530497954))
            Line((-FILLET_3_R * 0.0164653654786, FILLET_3_R * 0.0113530497954), (0, -FILLET_3_R * 0.02))
            Line((0, -FILLET_3_R * 0.02), (FILLET_3_R * 1.90418183162, -FILLET_3_R * 0.02))
            Line((FILLET_3_R * 1.90418183162, -FILLET_3_R * 0.02), (FILLET_3_R * 1.90418183162, 0))
        make_face()
    fillet_3_piece_23 = extrude(amount=12.521086374, mode=Mode.PRIVATE)
    fillet_3_piece_23 = split(fillet_3_piece_23, bisect_by=Plane(origin=(43.240638921, -5.999710295, -0.026652857), z_dir=(0, -0.9999409315100345, -0.01086892316858739)), keep=Keep.TOP, mode=Mode.PRIVATE)
    add(fillet_3_piece_23)
    with BuildSketch(Plane(origin=(45.141316474, -6, 0), x_dir=(-1, 0, 0), z_dir=(0, 1, 0))) as fillet_3_piece_24_section:
        with BuildLine():
            CenterArc((FILLET_3_R * 1.90418183162, FILLET_3_R), FILLET_3_R, 145.413311576, 124.586688424)
            Line((FILLET_3_R * 1.08091355769, FILLET_3_R * 1.56765248977), (FILLET_3_R * 1.06444819221, FILLET_3_R * 1.57900553956))
            Line((FILLET_3_R * 1.06444819221, FILLET_3_R * 1.57900553956), (-FILLET_3_R * 0.0164653654786, FILLET_3_R * 0.0113530497954))
            Line((-FILLET_3_R * 0.0164653654786, FILLET_3_R * 0.0113530497954), (0, -FILLET_3_R * 0.02))
            Line((0, -FILLET_3_R * 0.02), (FILLET_3_R * 1.90418183162, -FILLET_3_R * 0.02))
            Line((FILLET_3_R * 1.90418183162, -FILLET_3_R * 0.02), (FILLET_3_R * 1.90418183162, 0))
        make_face()
    fillet_3_piece_24 = extrude(amount=12.521086374, mode=Mode.PRIVATE)
    fillet_3_piece_24 = split(fillet_3_piece_24, bisect_by=Plane(origin=(43.652851134, 6, 0.780052661), z_dir=(0, -1, 0)), keep=Keep.TOP, mode=Mode.PRIVATE)
    fillet_3_piece_24 = split(fillet_3_piece_24, bisect_by=Plane(origin=(43.652851134, 3.008478327, 0.79630992), z_dir=(0, 0.9999409315100345, -0.01086892316858714)), keep=Keep.TOP, mode=Mode.PRIVATE)
    add(fillet_3_piece_24)
    with BuildSketch(Plane(origin=(45.141316474, -6, 0), x_dir=(-1, 0, 0), z_dir=(0, 1, 0))) as fillet_3_piece_25_section:
        with BuildLine():
            CenterArc((FILLET_3_R * 1.90418183162, FILLET_3_R), FILLET_3_R, 145.413311576, 124.586688424)
            Line((FILLET_3_R * 1.08091355769, FILLET_3_R * 1.56765248977), (FILLET_3_R * 1.06444819221, FILLET_3_R * 1.57900553956))
            Line((FILLET_3_R * 1.06444819221, FILLET_3_R * 1.57900553956), (-FILLET_3_R * 0.0164653654786, FILLET_3_R * 0.0113530497954))
            Line((-FILLET_3_R * 0.0164653654786, FILLET_3_R * 0.0113530497954), (0, -FILLET_3_R * 0.02))
            Line((0, -FILLET_3_R * 0.02), (FILLET_3_R * 1.90418183162, -FILLET_3_R * 0.02))
            Line((FILLET_3_R * 1.90418183162, -FILLET_3_R * 0.02), (FILLET_3_R * 1.90418183162, 0))
        make_face()
    fillet_3_piece_25 = extrude(amount=12.521086374, mode=Mode.PRIVATE)
    fillet_3_piece_25 = split(fillet_3_piece_25, bisect_by=Plane(origin=(43.662831951, 6, 1.349647934), z_dir=(0, 1, 0)), keep=Keep.TOP, mode=Mode.PRIVATE)
    fillet_3_piece_25 = split(fillet_3_piece_25, bisect_by=Plane(origin=(43.662831951, 6.01466922, 1.349568214), z_dir=(0, -0.9999409315100345, 0.010868923168587275)), keep=Keep.TOP, mode=Mode.PRIVATE)
    add(fillet_3_piece_25)
    with BuildSketch(Plane(origin=(45.141316474, -6, 0), x_dir=(-1, 0, 0), z_dir=(0, 1, 0))) as fillet_3_piece_26_section:
        with BuildLine():
            CenterArc((FILLET_3_R * 1.90418183162, FILLET_3_R), FILLET_3_R, 145.413311576, 124.586688424)
            Line((FILLET_3_R * 1.08091355769, FILLET_3_R * 1.56765248977), (FILLET_3_R * 1.06444819221, FILLET_3_R * 1.57900553956))
            Line((FILLET_3_R * 1.06444819221, FILLET_3_R * 1.57900553956), (-FILLET_3_R * 0.0164653654786, FILLET_3_R * 0.0113530497954))
            Line((-FILLET_3_R * 0.0164653654786, FILLET_3_R * 0.0113530497954), (0, -FILLET_3_R * 0.02))
            Line((0, -FILLET_3_R * 0.02), (FILLET_3_R * 1.90418183162, -FILLET_3_R * 0.02))
            Line((FILLET_3_R * 1.90418183162, -FILLET_3_R * 0.02), (FILLET_3_R * 1.90418183162, 0))
        make_face()
    fillet_3_piece_26 = extrude(amount=12.521086374, mode=Mode.PRIVATE)
    fillet_3_piece_26 = split(fillet_3_piece_26, bisect_by=Plane(origin=(43.240638921, 6, -0.026654432), z_dir=(0, -1, 0)), keep=Keep.TOP, mode=Mode.PRIVATE)
    fillet_3_piece_26 = split(fillet_3_piece_26, bisect_by=Plane(origin=(43.240638921, 5.999710295, -0.026652857), z_dir=(0, 0.9999409315100345, -0.010868923168587275)), keep=Keep.TOP, mode=Mode.PRIVATE)
    add(fillet_3_piece_26)

    # 圆角4
    fillet_4_edges = [part.edges().sort_by_distance(p)[0] for p in [
        (42.101361871, 4.624426836, 11.45542087),
        (42.101361871, -4.624426836, 11.45542087),
        (33.361948293, 5.356956207, 78.848122968),
        (33.361948293, -5.356956207, 78.848122968),
    ]]
    fillet(fillet_4_edges, radius=FILLET_4_R)

    # 圆角5
    fillet_5_edges = [part.edges().sort_by_distance(p)[0] for p in [
        (44.585265539, 4.585270166, 7.853007208),
        (44.585265539, -4.585270166, 7.853007208),
    ]]
    fillet(fillet_5_edges, radius=FILLET_5_R)

    # 草图22 → 切除-拉伸10 (cut, two sides: drawn at the far end of the back side and taken through both)
    with BuildSketch(Plane.XZ.offset(6).offset(-CUT_EXTRUDE_10_DEPTH_BACK)):
        with Locations((34.517846697, 49.92726778)):
            Rectangle(SKETCH_22_W, SKETCH_22_H)
    extrude(amount=CUT_EXTRUDE_10_DEPTH + CUT_EXTRUDE_10_DEPTH_BACK, mode=Mode.SUBTRACT)

    # 草图24 → 切除-拉伸11 (cut)
    with BuildSketch(Plane.XY):
        with Locations((32.5, 0)):
            Rectangle(SKETCH_24_W, SKETCH_24_H)
    extrude(amount=-CUT_EXTRUDE_11_DEPTH, mode=Mode.SUBTRACT)

    # 草图25 → 切除-拉伸12 (cut)
    with BuildSketch(Plane(origin=(0, 6, 0), x_dir=(1, 0, 0), z_dir=(0, 1, 0))):
        with Locations(Location((18, 2, 0), (0, 0, 180))):
            Circle(SKETCH_25_R)
        with Locations(Location((47, 2, 0), (0, 0, 180))):
            Circle(SKETCH_25_R)
    extrude(amount=-CUT_EXTRUDE_12_DEPTH, mode=Mode.SUBTRACT)

    # 镜向2: part across plane


with BuildPart() as part_1:
    add(part.part)
    add(part.part.mirror(Plane(origin=(50, -6, -5), x_dir=(0, 0, 1), z_dir=(1, 0, 0))))

    # 草图27 → 凸台-拉伸7 (add)
    with BuildSketch(Plane.XY.offset(-2)):
        with Locations((26.315, 2.5)):
            Circle(SKETCH_27_R)
        with Locations((26.315, -2.5)):
            Circle(SKETCH_27_R)
        with Locations((73.685, 2.5)):
            Circle(SKETCH_27_R)
        with Locations((73.685, -2.5)):
            Circle(SKETCH_27_R)
    extrude(amount=-EXTRUDE_7_DEPTH)

    # 草图28 → 切除-拉伸13 (cut)
    with BuildSketch(Plane.XY.offset(-2)):
        with Locations((23.685, 2.5)):
            Circle(SKETCH_28_R)
        with Locations((23.685, -2.5)):
            Circle(SKETCH_28_R)
        with Locations((76.315, -2.5)):
            Circle(SKETCH_28_R)
        with Locations((76.315, 2.5)):
            Circle(SKETCH_28_R)
    extrude(amount=-CUT_EXTRUDE_13_DEPTH, mode=Mode.SUBTRACT)


solid = part_1.part
